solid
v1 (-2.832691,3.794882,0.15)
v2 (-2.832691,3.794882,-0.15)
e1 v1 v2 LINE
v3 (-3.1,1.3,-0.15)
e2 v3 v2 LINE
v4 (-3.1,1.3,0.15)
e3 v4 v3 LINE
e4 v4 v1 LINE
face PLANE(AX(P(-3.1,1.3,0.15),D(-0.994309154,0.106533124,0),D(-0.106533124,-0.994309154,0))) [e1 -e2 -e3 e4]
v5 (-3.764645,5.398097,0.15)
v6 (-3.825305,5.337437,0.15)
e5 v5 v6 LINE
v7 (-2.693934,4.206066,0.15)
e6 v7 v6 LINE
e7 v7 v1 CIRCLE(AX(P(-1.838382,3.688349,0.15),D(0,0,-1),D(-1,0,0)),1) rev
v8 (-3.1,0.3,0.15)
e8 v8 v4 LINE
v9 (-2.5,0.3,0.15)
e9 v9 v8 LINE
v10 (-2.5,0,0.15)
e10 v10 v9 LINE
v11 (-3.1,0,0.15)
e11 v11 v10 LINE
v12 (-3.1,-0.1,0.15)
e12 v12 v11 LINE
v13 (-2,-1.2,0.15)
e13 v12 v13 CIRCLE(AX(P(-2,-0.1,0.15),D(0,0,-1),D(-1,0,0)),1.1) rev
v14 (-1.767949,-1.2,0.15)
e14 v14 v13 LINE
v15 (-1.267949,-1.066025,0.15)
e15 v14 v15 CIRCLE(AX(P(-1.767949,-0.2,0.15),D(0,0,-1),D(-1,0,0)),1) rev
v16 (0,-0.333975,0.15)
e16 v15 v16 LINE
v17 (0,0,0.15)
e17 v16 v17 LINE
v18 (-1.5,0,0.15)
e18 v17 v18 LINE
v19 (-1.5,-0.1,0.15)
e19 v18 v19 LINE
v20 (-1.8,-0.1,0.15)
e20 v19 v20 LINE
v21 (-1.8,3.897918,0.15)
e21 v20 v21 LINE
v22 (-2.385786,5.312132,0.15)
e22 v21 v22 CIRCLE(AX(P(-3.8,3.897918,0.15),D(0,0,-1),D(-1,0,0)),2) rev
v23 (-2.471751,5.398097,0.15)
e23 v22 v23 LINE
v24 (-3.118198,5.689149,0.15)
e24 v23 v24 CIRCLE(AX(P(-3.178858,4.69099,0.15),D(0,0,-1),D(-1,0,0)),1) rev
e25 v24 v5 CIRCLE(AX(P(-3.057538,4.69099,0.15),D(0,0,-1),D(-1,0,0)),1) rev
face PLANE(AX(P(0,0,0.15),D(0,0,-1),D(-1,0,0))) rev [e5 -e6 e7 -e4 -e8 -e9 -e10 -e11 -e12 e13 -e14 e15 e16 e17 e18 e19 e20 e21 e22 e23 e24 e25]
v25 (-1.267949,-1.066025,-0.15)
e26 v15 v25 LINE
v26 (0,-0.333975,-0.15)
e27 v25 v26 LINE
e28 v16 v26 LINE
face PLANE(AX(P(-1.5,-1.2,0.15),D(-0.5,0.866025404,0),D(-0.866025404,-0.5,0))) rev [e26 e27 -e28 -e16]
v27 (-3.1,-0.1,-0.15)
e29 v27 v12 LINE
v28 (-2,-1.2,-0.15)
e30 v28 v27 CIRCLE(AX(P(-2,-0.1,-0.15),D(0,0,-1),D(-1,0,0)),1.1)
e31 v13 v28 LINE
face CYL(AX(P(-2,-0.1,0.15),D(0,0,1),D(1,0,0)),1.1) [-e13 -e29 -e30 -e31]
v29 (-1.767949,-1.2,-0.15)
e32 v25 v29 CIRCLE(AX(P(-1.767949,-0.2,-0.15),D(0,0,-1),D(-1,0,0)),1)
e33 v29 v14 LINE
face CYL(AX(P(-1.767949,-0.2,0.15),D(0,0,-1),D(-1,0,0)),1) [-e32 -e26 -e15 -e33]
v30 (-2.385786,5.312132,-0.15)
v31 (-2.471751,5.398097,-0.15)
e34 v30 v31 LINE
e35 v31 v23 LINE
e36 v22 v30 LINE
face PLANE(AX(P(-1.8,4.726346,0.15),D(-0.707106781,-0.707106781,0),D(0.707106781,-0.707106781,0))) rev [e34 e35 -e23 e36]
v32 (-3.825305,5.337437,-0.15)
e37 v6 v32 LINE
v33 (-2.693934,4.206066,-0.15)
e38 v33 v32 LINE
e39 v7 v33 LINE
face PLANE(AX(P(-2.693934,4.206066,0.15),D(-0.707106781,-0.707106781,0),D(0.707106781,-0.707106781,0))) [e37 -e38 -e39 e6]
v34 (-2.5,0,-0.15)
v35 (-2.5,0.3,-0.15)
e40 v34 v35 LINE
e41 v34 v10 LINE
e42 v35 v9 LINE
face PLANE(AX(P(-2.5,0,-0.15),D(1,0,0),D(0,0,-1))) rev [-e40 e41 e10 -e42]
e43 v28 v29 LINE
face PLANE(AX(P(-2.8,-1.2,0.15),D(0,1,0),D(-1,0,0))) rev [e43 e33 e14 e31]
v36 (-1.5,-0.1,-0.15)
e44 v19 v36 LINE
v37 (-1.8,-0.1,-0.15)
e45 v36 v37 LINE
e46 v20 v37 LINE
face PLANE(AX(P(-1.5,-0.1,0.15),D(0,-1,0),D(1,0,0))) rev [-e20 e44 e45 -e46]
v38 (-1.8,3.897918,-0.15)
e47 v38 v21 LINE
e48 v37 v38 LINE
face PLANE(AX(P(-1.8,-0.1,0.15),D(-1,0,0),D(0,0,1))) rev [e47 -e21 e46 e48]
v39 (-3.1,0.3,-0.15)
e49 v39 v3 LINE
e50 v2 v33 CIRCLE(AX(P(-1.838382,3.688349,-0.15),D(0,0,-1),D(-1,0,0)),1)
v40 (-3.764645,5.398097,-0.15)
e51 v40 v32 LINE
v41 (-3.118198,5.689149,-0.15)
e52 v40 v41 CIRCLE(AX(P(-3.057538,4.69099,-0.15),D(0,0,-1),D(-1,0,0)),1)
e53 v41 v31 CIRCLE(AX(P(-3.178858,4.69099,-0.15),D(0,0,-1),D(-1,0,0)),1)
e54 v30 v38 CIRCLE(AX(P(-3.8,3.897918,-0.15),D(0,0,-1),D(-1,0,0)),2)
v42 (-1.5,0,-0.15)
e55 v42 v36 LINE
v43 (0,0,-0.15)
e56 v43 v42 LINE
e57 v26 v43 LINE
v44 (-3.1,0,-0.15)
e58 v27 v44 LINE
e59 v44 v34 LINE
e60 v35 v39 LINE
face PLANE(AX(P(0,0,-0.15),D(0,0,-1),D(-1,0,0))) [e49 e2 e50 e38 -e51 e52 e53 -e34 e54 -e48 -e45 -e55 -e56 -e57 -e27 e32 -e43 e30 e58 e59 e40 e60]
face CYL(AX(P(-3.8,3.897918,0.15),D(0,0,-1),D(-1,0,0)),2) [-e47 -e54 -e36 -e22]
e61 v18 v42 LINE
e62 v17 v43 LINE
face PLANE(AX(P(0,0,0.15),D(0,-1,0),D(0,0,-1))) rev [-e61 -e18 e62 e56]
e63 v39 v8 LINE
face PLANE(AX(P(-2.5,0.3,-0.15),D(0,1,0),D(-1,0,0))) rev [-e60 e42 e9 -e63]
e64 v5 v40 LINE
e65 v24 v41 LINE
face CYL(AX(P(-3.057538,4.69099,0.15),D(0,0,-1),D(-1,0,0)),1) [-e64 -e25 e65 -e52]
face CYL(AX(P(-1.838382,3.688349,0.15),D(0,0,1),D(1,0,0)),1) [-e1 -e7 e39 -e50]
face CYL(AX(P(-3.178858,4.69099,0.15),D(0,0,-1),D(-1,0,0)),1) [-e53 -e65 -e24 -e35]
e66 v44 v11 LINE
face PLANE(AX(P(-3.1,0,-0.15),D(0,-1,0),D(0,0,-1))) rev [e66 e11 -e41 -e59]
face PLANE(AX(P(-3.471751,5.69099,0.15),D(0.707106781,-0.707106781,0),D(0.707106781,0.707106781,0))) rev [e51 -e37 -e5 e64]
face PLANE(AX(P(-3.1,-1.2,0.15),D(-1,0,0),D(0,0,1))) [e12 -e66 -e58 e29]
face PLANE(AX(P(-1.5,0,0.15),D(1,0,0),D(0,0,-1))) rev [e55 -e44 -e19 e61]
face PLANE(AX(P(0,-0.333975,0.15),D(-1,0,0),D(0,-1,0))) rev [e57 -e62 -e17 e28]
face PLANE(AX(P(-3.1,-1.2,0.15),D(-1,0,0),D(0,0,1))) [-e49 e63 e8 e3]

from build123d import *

# Parameters (mm, degrees)
BOSS_EXTRUDE1_DEPTH = 0.15
FILLET1_R           = 1.1
SKETCH2_W           = 0.6
SKETCH2_H           = 0.3
CUT_EXTRUDE1_DEPTH  = 7.86369632
FILLET2_R           = 2
FILLET3_R           = 1


with BuildPart() as part:
    # Sketch1 → Boss-Extrude1 (new, symmetric)
    with BuildSketch(Plane.XY):
        Polygon((0, 0), (-1.5, 0), (-1.5, -0.1), (-1.8, -0.1), (-1.8, 3.1), (-1.8, 3.517211082), (-1.8, 4.726345597), (-2.764644661, 5.690990258), (-3.471751442, 5.690990258), (-3.825304833, 5.337436867), (-2.693933983, 4.206066017), (-2.8, 4.1), (-3.1, 1.3), (-3.1, -1.2), (-2.8, -1.2), (-1.5, -1.2), (0, -0.333974596), align=None)
    extrude(amount=BOSS_EXTRUDE1_DEPTH, both=True)

    # Fillet1
    fillet1_edges = [part.edges().sort_by_distance(p)[0] for p in [
        (-3.1, -1.2, 0),
    ]]
    fillet(fillet1_edges, radius=FILLET1_R)

    # Sketch2 → Cut-Extrude1 (cut, through all)
    with BuildSketch(Plane.XY.offset(0.15)):
        with Locations((-2.8, 0.15)):
            Rectangle(SKETCH2_W, SKETCH2_H)
    extrude(amount=-CUT_EXTRUDE1_DEPTH, mode=Mode.SUBTRACT)

    # Fillet2
    fillet2_edges = [part.edges().sort_by_distance(p)[0] for p in [
        (-1.8, 4.726345597, 0),
    ]]
    fillet(fillet2_edges, radius=FILLET2_R)

    # Fillet3
    # the kernel refuses this fillet: 1 mm, written as the material it takes off along each edge
    with BuildSketch(Plane(origin=(-2.8, 4.1, -0.917160411), x_dir=(0.7071067811865565, 0.7071067811865387, 0), z_dir=(0, 0, 1))) as fillet3_piece_1:
        with BuildLine():
            CenterArc((0.388885384, -0.971047771), FILLET3_R, 103.820764191, 25.063732242)
            Line((-0.238867067, -0.192634731), (-0.251422116, -0.177066471))
            Line((-0.251422116, -0.177066471), (-0.012555049, 0.015568261))
            Line((-0.012555049, 0.015568261), (0, 0.02))
            ThreePointArc((0, 0.02), (0.075, 0.02), (0.145222292, 0.019420955))
            Line((0.145222292, 0.019420955), (0.15, 0))
        make_face()
    extrude(amount=1.834320821, mode=Mode.SUBTRACT)
    with BuildSketch(Plane(origin=(-1.5, -1.2, 0.819872981), x_dir=(0.8660254037844393, 0.49999999999999883, 0), z_dir=(0, 0, -1))) as fillet3_piece_2:
        with BuildLine():
            CenterArc((FILLET3_R * 0.267949192431, -FILLET3_R), FILLET3_R, 90, 30)
            Line((-FILLET3_R * 0.232050807569, -FILLET3_R * 0.133974596216), (-FILLET3_R * 0.242050807569, -FILLET3_R * 0.11665408814))
            Line((-FILLET3_R * 0.242050807569, -FILLET3_R * 0.11665408814), (-FILLET3_R * 0.00535898384862, FILLET3_R * 0.02))
            Line((-FILLET3_R * 0.00535898384862, FILLET3_R * 0.02), (FILLET3_R * 0.267949192431, FILLET3_R * 0.02))
            Line((FILLET3_R * 0.267949192431, FILLET3_R * 0.02), (FILLET3_R * 0.267949192431, 0))
        make_face()
    extrude(amount=1.639745962, mode=Mode.SUBTRACT)
    with BuildSketch(Plane(origin=(-3.471751442, 5.690990258, -1.185533906), x_dir=(1, 0, 0), z_dir=(0, 0, 1)), Plane(origin=(-2.764644661, 5.690990258, -1.185533906), x_dir=(0.7071067811865444, -0.7071067811865508, 0), z_dir=(0, 0, 1))) as fillet3_piece_3:
        with BuildLine():
            CenterArc((FILLET3_R * 0.414213562373, -FILLET3_R), FILLET3_R, 90, 45)
            Line((-FILLET3_R * 0.292893218813, -FILLET3_R * 0.292893218813), (-FILLET3_R * 0.307035354437, -FILLET3_R * 0.27875108319))
            Line((-FILLET3_R * 0.307035354437, -FILLET3_R * 0.27875108319), (-FILLET3_R * 0.00828427124746, FILLET3_R * 0.02))
            Line((-FILLET3_R * 0.00828427124746, FILLET3_R * 0.02), (FILLET3_R * 0.414213562373, FILLET3_R * 0.02))
            Line((FILLET3_R * 0.414213562373, FILLET3_R * 0.02), (FILLET3_R * 0.414213562373, 0))
        make_face()
    extrude(amount=2.371067812, mode=Mode.SUBTRACT)


solid = part.part
